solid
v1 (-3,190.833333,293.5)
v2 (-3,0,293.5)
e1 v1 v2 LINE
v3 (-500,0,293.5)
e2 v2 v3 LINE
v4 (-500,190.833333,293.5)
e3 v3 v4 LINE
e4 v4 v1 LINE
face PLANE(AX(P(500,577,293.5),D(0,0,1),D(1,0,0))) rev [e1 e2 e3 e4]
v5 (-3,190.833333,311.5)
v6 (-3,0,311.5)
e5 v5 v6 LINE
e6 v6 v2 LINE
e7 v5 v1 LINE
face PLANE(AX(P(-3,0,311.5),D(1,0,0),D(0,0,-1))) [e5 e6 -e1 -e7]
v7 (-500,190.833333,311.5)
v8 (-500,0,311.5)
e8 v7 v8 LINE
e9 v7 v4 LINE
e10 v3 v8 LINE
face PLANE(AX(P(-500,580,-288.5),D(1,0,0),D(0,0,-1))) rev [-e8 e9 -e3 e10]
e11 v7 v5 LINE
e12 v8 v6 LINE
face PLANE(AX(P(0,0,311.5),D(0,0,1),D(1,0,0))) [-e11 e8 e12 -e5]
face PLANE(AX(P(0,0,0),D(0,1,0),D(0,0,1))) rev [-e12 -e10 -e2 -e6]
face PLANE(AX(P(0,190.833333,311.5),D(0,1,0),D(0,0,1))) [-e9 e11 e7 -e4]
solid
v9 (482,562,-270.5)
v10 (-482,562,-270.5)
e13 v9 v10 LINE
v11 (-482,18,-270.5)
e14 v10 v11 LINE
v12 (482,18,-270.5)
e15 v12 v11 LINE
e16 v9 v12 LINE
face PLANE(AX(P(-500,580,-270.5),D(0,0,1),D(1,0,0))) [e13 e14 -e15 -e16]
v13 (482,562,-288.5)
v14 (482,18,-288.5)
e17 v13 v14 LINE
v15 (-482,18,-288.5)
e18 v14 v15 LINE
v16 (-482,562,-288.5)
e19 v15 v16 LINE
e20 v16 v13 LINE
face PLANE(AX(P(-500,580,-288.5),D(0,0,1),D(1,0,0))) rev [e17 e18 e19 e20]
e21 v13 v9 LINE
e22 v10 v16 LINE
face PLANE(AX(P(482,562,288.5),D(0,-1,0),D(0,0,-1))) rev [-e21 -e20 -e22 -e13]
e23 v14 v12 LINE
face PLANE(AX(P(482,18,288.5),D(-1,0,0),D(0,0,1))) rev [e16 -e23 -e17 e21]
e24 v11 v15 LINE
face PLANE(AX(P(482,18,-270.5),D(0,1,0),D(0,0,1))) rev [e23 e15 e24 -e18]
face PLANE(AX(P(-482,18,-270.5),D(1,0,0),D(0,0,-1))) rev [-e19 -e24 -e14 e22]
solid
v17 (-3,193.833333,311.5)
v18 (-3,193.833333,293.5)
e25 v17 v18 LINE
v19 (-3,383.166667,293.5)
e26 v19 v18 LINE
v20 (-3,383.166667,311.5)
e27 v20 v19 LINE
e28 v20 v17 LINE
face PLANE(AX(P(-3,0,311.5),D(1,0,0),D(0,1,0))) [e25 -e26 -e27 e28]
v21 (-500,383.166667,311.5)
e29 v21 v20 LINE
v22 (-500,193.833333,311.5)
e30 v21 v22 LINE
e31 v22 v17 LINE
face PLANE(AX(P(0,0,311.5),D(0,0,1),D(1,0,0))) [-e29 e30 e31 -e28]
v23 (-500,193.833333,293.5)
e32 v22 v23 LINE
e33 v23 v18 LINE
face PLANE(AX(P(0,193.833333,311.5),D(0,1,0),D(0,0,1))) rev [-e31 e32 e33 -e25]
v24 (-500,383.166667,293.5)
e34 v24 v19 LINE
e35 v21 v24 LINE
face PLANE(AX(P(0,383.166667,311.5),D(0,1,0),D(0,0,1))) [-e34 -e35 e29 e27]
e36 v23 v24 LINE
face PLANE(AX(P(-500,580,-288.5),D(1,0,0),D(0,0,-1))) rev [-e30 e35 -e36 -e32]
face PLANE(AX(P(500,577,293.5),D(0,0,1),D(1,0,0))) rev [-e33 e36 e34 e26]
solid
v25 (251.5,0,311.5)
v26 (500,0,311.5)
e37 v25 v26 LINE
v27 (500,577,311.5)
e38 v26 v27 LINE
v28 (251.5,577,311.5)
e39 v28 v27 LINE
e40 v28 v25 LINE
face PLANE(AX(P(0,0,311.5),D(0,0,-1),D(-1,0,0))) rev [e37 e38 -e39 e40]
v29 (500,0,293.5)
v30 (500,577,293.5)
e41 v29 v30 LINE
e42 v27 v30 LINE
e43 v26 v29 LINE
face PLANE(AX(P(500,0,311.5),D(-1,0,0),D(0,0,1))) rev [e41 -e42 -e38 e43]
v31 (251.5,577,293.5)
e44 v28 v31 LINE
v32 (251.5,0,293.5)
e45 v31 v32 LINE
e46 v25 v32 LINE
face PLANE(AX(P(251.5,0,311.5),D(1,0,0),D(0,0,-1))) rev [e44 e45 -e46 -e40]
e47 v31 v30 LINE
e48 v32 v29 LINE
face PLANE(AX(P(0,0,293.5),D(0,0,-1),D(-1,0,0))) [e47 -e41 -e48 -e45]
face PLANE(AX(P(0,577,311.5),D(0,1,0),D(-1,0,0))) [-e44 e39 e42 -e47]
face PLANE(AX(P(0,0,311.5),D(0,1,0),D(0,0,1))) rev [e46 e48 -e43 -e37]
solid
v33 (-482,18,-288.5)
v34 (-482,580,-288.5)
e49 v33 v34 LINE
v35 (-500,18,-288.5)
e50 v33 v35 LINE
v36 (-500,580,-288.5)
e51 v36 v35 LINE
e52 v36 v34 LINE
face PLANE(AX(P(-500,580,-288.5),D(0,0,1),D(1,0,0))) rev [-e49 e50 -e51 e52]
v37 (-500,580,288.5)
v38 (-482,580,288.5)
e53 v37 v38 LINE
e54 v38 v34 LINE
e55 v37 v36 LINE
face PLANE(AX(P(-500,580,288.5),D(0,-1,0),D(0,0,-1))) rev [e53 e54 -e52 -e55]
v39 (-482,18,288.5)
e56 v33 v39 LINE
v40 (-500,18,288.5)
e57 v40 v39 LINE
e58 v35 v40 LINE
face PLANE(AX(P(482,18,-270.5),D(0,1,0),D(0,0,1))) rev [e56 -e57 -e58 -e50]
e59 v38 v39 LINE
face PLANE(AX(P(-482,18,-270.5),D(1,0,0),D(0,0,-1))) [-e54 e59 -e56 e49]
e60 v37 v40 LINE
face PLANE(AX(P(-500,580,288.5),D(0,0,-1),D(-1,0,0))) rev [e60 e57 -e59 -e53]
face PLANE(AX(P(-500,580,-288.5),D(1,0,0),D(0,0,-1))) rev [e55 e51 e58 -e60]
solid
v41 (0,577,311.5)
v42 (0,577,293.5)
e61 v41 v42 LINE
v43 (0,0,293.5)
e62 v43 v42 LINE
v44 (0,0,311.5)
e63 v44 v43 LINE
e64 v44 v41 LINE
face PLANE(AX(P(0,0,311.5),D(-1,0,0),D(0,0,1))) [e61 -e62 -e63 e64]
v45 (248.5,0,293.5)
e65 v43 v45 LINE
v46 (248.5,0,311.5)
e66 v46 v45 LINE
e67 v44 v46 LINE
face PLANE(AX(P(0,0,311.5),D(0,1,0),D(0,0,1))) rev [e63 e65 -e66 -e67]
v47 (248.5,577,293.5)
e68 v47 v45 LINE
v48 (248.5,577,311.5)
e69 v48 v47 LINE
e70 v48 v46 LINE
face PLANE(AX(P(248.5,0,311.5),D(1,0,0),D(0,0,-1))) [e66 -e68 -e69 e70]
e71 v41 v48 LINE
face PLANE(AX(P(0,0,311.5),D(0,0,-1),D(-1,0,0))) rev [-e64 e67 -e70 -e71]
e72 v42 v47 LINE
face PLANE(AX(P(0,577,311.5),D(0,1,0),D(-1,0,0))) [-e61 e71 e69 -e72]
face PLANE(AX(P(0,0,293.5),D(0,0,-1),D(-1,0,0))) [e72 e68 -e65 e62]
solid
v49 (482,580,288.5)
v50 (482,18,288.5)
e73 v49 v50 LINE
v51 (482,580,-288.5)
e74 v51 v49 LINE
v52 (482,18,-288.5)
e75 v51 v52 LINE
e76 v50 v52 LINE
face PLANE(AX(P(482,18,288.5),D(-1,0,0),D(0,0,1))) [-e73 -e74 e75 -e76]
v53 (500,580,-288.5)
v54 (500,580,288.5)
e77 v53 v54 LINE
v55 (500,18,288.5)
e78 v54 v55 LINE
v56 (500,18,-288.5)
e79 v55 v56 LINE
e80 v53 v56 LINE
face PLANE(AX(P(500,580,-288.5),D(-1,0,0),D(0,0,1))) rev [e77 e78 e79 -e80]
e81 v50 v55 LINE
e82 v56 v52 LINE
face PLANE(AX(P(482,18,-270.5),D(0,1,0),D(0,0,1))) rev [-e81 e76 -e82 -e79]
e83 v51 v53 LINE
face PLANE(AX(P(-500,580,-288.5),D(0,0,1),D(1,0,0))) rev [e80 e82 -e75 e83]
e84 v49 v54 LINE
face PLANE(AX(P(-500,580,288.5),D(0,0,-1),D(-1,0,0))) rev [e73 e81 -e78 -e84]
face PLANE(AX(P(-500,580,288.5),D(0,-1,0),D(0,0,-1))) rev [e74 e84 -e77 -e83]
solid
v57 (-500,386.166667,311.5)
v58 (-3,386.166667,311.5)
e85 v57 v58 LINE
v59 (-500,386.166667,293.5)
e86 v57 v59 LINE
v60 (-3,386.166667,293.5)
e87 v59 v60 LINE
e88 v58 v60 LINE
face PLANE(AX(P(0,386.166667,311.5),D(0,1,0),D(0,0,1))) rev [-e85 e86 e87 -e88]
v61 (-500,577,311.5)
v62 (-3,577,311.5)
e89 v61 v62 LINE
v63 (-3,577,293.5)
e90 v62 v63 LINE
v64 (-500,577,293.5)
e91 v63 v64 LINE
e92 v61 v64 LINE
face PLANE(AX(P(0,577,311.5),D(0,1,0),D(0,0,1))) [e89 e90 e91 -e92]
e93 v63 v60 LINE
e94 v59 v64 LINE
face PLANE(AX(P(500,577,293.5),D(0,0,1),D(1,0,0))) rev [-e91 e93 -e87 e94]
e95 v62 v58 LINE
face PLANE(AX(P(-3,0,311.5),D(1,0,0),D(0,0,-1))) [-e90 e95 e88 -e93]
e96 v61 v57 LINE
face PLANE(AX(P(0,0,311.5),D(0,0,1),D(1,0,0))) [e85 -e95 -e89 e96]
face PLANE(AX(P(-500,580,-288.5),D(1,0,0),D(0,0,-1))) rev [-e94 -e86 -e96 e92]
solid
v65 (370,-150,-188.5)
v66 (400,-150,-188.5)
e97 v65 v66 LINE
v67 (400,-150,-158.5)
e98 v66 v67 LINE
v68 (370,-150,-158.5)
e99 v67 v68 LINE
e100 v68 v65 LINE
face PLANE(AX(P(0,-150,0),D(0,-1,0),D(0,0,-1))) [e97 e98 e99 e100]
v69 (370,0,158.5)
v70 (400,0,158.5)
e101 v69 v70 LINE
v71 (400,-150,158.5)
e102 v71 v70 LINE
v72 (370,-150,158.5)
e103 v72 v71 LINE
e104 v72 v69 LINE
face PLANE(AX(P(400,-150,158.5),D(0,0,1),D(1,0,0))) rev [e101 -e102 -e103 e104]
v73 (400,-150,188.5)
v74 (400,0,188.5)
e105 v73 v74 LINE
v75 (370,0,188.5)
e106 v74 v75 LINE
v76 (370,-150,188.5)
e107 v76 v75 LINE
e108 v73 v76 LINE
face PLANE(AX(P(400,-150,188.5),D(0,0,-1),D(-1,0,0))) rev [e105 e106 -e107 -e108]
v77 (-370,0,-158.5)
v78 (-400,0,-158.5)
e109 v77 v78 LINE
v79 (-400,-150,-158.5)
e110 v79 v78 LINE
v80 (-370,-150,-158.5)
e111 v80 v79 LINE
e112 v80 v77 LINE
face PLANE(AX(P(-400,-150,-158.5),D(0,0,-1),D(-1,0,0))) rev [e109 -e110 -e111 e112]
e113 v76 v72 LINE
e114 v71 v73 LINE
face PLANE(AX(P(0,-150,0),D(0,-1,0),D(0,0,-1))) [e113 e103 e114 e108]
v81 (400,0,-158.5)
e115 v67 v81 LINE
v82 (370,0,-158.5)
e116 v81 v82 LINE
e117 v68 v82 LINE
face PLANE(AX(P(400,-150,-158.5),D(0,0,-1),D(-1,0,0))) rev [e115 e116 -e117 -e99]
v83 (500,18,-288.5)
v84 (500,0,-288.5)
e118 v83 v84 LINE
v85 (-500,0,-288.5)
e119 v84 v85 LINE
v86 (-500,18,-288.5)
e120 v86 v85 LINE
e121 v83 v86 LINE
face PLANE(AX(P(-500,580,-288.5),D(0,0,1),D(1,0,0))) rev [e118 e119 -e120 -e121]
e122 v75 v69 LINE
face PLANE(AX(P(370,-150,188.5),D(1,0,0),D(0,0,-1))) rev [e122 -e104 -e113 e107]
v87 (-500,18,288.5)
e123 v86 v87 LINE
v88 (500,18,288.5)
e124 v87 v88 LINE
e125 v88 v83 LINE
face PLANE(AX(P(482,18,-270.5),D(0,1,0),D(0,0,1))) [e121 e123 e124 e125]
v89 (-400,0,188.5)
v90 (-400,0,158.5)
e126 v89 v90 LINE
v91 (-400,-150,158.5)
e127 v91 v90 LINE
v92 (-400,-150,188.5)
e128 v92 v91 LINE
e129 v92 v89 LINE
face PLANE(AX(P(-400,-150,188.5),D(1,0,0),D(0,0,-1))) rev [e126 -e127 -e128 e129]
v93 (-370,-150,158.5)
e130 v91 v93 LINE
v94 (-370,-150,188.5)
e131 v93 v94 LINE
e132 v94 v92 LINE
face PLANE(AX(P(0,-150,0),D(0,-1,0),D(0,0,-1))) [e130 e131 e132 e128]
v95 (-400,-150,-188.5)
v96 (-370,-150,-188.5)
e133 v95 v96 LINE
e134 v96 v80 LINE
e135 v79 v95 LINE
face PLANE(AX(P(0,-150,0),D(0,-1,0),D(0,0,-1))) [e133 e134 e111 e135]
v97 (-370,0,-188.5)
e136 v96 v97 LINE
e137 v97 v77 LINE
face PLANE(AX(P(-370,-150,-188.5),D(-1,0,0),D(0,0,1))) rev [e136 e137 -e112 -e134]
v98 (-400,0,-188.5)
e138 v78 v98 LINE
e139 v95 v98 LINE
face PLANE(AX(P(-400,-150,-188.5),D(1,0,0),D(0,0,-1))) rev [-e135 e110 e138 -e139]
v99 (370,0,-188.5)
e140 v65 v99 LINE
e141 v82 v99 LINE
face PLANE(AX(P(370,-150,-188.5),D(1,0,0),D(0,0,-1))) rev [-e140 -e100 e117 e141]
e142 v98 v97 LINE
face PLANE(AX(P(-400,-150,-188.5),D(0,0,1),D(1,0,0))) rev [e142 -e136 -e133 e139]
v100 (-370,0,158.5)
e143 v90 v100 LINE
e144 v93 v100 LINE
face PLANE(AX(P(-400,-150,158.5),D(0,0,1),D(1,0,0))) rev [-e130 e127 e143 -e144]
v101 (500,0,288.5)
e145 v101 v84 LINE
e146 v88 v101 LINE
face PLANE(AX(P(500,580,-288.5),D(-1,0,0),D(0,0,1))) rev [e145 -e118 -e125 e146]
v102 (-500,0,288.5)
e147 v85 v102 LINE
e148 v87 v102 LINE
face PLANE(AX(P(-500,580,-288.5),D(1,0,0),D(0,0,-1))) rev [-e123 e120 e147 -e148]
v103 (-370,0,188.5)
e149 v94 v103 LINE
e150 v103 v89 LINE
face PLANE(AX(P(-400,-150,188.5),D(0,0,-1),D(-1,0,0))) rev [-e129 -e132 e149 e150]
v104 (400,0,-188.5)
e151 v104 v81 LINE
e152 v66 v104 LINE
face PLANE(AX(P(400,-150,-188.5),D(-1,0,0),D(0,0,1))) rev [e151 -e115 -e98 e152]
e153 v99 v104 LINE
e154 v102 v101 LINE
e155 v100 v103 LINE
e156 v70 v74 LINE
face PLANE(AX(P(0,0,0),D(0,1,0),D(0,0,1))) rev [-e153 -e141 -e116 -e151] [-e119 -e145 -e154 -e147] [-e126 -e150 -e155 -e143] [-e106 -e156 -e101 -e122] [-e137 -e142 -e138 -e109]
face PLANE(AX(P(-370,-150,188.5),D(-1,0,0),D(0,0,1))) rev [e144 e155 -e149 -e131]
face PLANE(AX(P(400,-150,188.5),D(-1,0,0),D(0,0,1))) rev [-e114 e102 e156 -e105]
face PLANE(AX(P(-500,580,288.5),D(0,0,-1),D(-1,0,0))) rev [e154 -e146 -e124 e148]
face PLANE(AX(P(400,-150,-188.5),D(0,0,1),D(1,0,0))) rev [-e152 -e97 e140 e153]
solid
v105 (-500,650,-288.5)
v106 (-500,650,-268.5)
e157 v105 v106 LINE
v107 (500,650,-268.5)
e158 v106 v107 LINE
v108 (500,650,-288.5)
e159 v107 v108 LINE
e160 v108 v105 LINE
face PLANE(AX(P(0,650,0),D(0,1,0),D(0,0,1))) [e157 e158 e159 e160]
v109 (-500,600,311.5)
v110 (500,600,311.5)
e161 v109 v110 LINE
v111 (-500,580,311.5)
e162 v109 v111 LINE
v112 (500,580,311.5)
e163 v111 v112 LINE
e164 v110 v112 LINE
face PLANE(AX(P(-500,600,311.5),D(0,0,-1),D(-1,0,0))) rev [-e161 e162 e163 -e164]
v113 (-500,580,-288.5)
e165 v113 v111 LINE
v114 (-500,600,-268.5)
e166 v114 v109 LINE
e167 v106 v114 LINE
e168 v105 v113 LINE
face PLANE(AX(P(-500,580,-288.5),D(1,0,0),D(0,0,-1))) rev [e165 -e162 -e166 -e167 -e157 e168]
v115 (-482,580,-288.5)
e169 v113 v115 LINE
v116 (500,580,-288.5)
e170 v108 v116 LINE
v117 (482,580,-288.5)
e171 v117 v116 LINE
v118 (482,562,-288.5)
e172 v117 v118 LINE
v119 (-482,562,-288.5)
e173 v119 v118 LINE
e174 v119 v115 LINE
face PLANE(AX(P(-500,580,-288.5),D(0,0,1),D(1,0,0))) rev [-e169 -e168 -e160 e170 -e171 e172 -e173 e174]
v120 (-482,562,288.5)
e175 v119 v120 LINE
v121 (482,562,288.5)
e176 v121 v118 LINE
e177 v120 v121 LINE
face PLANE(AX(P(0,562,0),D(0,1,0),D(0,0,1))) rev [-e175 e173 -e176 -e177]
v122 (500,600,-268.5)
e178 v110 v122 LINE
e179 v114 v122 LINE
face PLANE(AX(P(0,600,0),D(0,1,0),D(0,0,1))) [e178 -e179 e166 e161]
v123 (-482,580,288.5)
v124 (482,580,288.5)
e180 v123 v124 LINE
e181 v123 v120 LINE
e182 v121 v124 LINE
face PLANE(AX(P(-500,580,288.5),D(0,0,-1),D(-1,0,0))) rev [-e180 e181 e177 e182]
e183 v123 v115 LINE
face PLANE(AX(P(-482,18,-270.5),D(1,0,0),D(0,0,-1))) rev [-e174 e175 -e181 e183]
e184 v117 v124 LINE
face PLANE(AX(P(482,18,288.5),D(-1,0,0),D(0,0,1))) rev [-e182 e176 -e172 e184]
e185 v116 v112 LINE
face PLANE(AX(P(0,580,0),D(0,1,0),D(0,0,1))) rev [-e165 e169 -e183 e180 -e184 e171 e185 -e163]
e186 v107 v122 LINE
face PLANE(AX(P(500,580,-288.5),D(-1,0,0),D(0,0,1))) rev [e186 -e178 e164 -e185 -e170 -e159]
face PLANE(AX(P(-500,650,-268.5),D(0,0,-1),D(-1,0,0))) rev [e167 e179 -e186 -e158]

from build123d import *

# Parameters (mm, degrees)
CROQUIS1_W                = 1000
CROQUIS1_H                = 577
SALIENTE_EXTRUIR1_DEPTH   = 580
VACIADO1_T                = -18
CROQUIS2_W                = 1000
CROQUIS2_H                = 600
SALIENTE_EXTRUIR2_DEPTH   = 20
CROQUIS3_W                = 479
CROQUIS3_H                = 175.833333333
CROQUIS3_W_2              = 18
CROQUIS3_H_2              = 189.333333334
CROQUIS3_H_3              = 172.833333333
SALIENTE_EXTRUIR4_DEPTH   = 23
CROQUIS5_W                = 5
CROQUIS5_H                = 577
CORTAR_EXTRUIR1_DEPTH     = 1208.075908963
CROQUIS6_W                = 248.5
CROQUIS6_H                = 577
SALIENTE_EXTRUIR5_DEPTH   = 18
SALIENTE_EXTRUIR5_2_DEPTH = 18
PARTIR5_OUTLINE_W         = 1000
PARTIR5_OUTLINE_H         = 577
PARTIR5_DEPTH             = 18
PARTIR5_2_OUTLINE_W       = 1000
PARTIR5_2_OUTLINE_H       = 577
PARTIR5_2_DEPTH           = 18
PARTIR6_START             = 18
PARTIR6_OUTLINE_W         = 18
PARTIR6_OUTLINE_H         = 577
PARTIR6_DEPTH             = 562
PARTIR6_2_OUTLINE_W       = 18
PARTIR6_2_OUTLINE_H       = 577
PARTIR6_2_DEPTH           = 562
PARTIR6_START_2           = -500
PARTIR6_3_OUTLINE_W       = 562
PARTIR6_3_OUTLINE_H       = 577
PARTIR6_3_DEPTH           = 18
PARTIR6_START_3           = 482
PARTIR6_4_OUTLINE_W       = 562
PARTIR6_4_OUTLINE_H       = 577
PARTIR6_4_DEPTH           = 18
PARTIR11_START            = -482
PARTIR11_OUTLINE_W        = 544
PARTIR11_OUTLINE_H        = 18
PARTIR11_DEPTH            = 964
PARTIR11_START_2          = 18
PARTIR11_2_OUTLINE_W      = 964
PARTIR11_2_OUTLINE_H      = 18
PARTIR11_2_DEPTH          = 544
CROQUIS7_W                = 1000
CROQUIS7_H                = 20
SALIENTE_EXTRUIR6_DEPTH   = 50
CROQUIS8_W                = 30
CROQUIS8_H                = 30
SALIENTE_EXTRUIR7_DEPTH   = 150


# Read off the part's stored shape, not the designer's step: Partir5, Partir6, Partir11
with BuildPart() as part:
    # Croquis1 → Saliente-Extruir1 (new body)
    with BuildSketch(Plane(origin=(0, 0, 0), x_dir=(1, 0, 0), z_dir=(0, 1, 0))):
        Rectangle(CROQUIS1_W, CROQUIS1_H)
    extrude(amount=SALIENTE_EXTRUIR1_DEPTH)

    # Vaciado1
    vaciado1_openings = [part.faces().sort_by_distance(p)[0] for p in [
        (0, 290, 288.5),
    ]]
    offset(amount=VACIADO1_T, openings=vaciado1_openings, kind=Kind.INTERSECTION)

    # Croquis2 → Saliente-Extruir2 (add)
    with BuildSketch(Plane(origin=(0, 580, 0), x_dir=(1, 0, 0), z_dir=(0, 1, 0))):
        with Locations((0, -11.5)):
            Rectangle(CROQUIS2_W, CROQUIS2_H)
    extrude(amount=SALIENTE_EXTRUIR2_DEPTH)

    # Croquis3 → Saliente-Extruir4 (add)
    with BuildSketch(Plane.XY.offset(288.5)):
        Polygon((-3, 577), (-500, 577), (-500, 386.166666667), (-482, 386.166666667), (-482, 562), (-3, 562), align=None)
        with Locations((-242.5, 474.083333334)):
            Rectangle(CROQUIS3_W, CROQUIS3_H)
        with Locations((-491, 288.5)):
            Rectangle(CROQUIS3_W_2, CROQUIS3_H_2)
        with Locations((-242.5, 288.5)):
            Rectangle(CROQUIS3_W, CROQUIS3_H_2)
        Polygon((-482, 18), (-482, 190.833333333), (-500, 190.833333333), (-500, 0), (-3, 0), (-3, 18), align=None)
        with Locations((-242.5, 104.416666667)):
            Rectangle(CROQUIS3_W, CROQUIS3_H_3)
    extrude(amount=SALIENTE_EXTRUIR4_DEPTH)

    # Croquis5 → Cortar-Extruir1 (cut, through all)
    with BuildSketch(Plane.ZY.offset(500)):
        with Locations((291, 288.5)):
            Rectangle(CROQUIS5_W, CROQUIS5_H)
    extrude(amount=-CORTAR_EXTRUIR1_DEPTH, mode=Mode.SUBTRACT)


with BuildPart() as cortar_extruir1_piece_1:
    # of the separate pieces the step leaves, piece 1, a body of its own (cortar_extruir1_pieces)
    add(part.part.solids().sort_by_distance((-500, 0, -288.5))[0])

    # Partir5 2 outline → Partir5 2 (cut)
    with BuildSketch(Plane(origin=(0, 0, 0), x_dir=(1, 0, 0), z_dir=(0, 1, 0))):
        Rectangle(PARTIR5_2_OUTLINE_W, PARTIR5_2_OUTLINE_H)
    extrude(amount=PARTIR5_2_DEPTH, mode=Mode.SUBTRACT)

    # Partir6 3 outline → Partir6 3 (cut)
    with BuildSketch(Plane.YZ.offset(PARTIR6_START_2)):
        with Locations((299, 0)):
            Rectangle(PARTIR6_3_OUTLINE_W, PARTIR6_3_OUTLINE_H)
    extrude(amount=PARTIR6_3_DEPTH, mode=Mode.SUBTRACT)

    # Partir6 4 outline → Partir6 4 (cut)
    with BuildSketch(Plane.YZ.offset(PARTIR6_START_3)):
        with Locations((299, 0)):
            Rectangle(PARTIR6_4_OUTLINE_W, PARTIR6_4_OUTLINE_H)
    extrude(amount=PARTIR6_4_DEPTH, mode=Mode.SUBTRACT)

    # Partir11 outline → Partir11 (cut)
    with BuildSketch(Plane.YZ.offset(PARTIR11_START)):
        with Locations((290, -279.5)):
            Rectangle(PARTIR11_OUTLINE_W, PARTIR11_OUTLINE_H)
    extrude(amount=PARTIR11_DEPTH, mode=Mode.SUBTRACT)

    # Croquis7 → Saliente-Extruir6 (add)
    with BuildSketch(Plane(origin=(0, 600, 0), x_dir=(1, 0, 0), z_dir=(0, 1, 0))):
        with Locations((0, 278.5)):
            Rectangle(CROQUIS7_W, CROQUIS7_H)
    extrude(amount=SALIENTE_EXTRUIR6_DEPTH)


with BuildPart() as cortar_extruir1_piece_2:
    # of the separate pieces the step leaves, piece 2, a body of its own (cortar_extruir1_pieces)
    add(part.part.solids().sort_by_distance((-500, 386.166666667, 293.5))[0])


with BuildPart() as cortar_extruir1_piece_3:
    # of the separate pieces the step leaves, piece 3, a body of its own (cortar_extruir1_pieces)
    add(part.part.solids().sort_by_distance((-500, 190.833333333, 293.5))[0])


with BuildPart() as cortar_extruir1_piece_4:
    # of the separate pieces the step leaves, piece 4, a body of its own (cortar_extruir1_pieces)
    add(part.part.solids().sort_by_distance((-500, 193.833333333, 293.5))[0])


with BuildPart() as body_5:
    # Croquis6 → Saliente-Extruir5 (new body)
    with BuildSketch(Plane(origin=(0, 0, 293.5), x_dir=(-1, 0, 0), z_dir=(0, 0, -1))):
        with Locations((-124.25, 288.5)):
            Rectangle(CROQUIS6_W, CROQUIS6_H)
    extrude(amount=-SALIENTE_EXTRUIR5_DEPTH)


with BuildPart() as body_6:
    # Croquis6 → Saliente-Extruir5 2 (new body)
    with BuildSketch(Plane(origin=(0, 0, 293.5), x_dir=(-1, 0, 0), z_dir=(0, 0, -1))):
        with Locations((-375.75, 288.5)):
            Rectangle(CROQUIS6_W, CROQUIS6_H)
    extrude(amount=-SALIENTE_EXTRUIR5_2_DEPTH)


with BuildPart() as body_7:
    # Partir5 outline → Partir5 (new body)
    with BuildSketch(Plane(origin=(0, 0, 0), x_dir=(1, 0, 0), z_dir=(0, 1, 0))):
        Rectangle(PARTIR5_OUTLINE_W, PARTIR5_OUTLINE_H)
    extrude(amount=PARTIR5_DEPTH)

    # Croquis8 → Saliente-Extruir7 (add)
    with BuildSketch(Plane.XZ):
        with Locations((-385, 173.5)):
            Rectangle(CROQUIS8_W, CROQUIS8_H)
        with Locations((385, 173.5)):
            Rectangle(CROQUIS8_W, CROQUIS8_H)
        with Locations((385, -173.5)):
            Rectangle(CROQUIS8_W, CROQUIS8_H)
        with Locations((-385, -173.5)):
            Rectangle(CROQUIS8_W, CROQUIS8_H)
    extrude(amount=SALIENTE_EXTRUIR7_DEPTH)


with BuildPart() as body_8:
    # Partir6 outline → Partir6 (new body)
    with BuildSketch(Plane(origin=(0, 0, 0), x_dir=(1, 0, 0), z_dir=(0, 1, 0)).offset(PARTIR6_START)):
        with Locations((491, 0)):
            Rectangle(PARTIR6_OUTLINE_W, PARTIR6_OUTLINE_H)
    extrude(amount=PARTIR6_DEPTH)


with BuildPart() as body_9:
    # Partir6 2 outline → Partir6 2 (new body)
    with BuildSketch(Plane(origin=(0, 0, 0), x_dir=(1, 0, 0), z_dir=(0, 1, 0)).offset(PARTIR6_START)):
        with Locations((-491, 0)):
            Rectangle(PARTIR6_2_OUTLINE_W, PARTIR6_2_OUTLINE_H)
    extrude(amount=PARTIR6_2_DEPTH)


with BuildPart() as body_10:
    # Partir11 2 outline → Partir11 2 (new body)
    with BuildSketch(Plane(origin=(0, 0, 0), x_dir=(1, 0, 0), z_dir=(0, 1, 0)).offset(PARTIR11_START_2)):
        with Locations((0, 279.5)):
            Rectangle(PARTIR11_2_OUTLINE_W, PARTIR11_2_OUTLINE_H)
    extrude(amount=PARTIR11_2_DEPTH)


solid = Compound([cortar_extruir1_piece_1.part, cortar_extruir1_piece_2.part, cortar_extruir1_piece_3.part, cortar_extruir1_piece_4.part, body_5.part, body_6.part, body_7.part, body_8.part, body_9.part, body_10.part])
